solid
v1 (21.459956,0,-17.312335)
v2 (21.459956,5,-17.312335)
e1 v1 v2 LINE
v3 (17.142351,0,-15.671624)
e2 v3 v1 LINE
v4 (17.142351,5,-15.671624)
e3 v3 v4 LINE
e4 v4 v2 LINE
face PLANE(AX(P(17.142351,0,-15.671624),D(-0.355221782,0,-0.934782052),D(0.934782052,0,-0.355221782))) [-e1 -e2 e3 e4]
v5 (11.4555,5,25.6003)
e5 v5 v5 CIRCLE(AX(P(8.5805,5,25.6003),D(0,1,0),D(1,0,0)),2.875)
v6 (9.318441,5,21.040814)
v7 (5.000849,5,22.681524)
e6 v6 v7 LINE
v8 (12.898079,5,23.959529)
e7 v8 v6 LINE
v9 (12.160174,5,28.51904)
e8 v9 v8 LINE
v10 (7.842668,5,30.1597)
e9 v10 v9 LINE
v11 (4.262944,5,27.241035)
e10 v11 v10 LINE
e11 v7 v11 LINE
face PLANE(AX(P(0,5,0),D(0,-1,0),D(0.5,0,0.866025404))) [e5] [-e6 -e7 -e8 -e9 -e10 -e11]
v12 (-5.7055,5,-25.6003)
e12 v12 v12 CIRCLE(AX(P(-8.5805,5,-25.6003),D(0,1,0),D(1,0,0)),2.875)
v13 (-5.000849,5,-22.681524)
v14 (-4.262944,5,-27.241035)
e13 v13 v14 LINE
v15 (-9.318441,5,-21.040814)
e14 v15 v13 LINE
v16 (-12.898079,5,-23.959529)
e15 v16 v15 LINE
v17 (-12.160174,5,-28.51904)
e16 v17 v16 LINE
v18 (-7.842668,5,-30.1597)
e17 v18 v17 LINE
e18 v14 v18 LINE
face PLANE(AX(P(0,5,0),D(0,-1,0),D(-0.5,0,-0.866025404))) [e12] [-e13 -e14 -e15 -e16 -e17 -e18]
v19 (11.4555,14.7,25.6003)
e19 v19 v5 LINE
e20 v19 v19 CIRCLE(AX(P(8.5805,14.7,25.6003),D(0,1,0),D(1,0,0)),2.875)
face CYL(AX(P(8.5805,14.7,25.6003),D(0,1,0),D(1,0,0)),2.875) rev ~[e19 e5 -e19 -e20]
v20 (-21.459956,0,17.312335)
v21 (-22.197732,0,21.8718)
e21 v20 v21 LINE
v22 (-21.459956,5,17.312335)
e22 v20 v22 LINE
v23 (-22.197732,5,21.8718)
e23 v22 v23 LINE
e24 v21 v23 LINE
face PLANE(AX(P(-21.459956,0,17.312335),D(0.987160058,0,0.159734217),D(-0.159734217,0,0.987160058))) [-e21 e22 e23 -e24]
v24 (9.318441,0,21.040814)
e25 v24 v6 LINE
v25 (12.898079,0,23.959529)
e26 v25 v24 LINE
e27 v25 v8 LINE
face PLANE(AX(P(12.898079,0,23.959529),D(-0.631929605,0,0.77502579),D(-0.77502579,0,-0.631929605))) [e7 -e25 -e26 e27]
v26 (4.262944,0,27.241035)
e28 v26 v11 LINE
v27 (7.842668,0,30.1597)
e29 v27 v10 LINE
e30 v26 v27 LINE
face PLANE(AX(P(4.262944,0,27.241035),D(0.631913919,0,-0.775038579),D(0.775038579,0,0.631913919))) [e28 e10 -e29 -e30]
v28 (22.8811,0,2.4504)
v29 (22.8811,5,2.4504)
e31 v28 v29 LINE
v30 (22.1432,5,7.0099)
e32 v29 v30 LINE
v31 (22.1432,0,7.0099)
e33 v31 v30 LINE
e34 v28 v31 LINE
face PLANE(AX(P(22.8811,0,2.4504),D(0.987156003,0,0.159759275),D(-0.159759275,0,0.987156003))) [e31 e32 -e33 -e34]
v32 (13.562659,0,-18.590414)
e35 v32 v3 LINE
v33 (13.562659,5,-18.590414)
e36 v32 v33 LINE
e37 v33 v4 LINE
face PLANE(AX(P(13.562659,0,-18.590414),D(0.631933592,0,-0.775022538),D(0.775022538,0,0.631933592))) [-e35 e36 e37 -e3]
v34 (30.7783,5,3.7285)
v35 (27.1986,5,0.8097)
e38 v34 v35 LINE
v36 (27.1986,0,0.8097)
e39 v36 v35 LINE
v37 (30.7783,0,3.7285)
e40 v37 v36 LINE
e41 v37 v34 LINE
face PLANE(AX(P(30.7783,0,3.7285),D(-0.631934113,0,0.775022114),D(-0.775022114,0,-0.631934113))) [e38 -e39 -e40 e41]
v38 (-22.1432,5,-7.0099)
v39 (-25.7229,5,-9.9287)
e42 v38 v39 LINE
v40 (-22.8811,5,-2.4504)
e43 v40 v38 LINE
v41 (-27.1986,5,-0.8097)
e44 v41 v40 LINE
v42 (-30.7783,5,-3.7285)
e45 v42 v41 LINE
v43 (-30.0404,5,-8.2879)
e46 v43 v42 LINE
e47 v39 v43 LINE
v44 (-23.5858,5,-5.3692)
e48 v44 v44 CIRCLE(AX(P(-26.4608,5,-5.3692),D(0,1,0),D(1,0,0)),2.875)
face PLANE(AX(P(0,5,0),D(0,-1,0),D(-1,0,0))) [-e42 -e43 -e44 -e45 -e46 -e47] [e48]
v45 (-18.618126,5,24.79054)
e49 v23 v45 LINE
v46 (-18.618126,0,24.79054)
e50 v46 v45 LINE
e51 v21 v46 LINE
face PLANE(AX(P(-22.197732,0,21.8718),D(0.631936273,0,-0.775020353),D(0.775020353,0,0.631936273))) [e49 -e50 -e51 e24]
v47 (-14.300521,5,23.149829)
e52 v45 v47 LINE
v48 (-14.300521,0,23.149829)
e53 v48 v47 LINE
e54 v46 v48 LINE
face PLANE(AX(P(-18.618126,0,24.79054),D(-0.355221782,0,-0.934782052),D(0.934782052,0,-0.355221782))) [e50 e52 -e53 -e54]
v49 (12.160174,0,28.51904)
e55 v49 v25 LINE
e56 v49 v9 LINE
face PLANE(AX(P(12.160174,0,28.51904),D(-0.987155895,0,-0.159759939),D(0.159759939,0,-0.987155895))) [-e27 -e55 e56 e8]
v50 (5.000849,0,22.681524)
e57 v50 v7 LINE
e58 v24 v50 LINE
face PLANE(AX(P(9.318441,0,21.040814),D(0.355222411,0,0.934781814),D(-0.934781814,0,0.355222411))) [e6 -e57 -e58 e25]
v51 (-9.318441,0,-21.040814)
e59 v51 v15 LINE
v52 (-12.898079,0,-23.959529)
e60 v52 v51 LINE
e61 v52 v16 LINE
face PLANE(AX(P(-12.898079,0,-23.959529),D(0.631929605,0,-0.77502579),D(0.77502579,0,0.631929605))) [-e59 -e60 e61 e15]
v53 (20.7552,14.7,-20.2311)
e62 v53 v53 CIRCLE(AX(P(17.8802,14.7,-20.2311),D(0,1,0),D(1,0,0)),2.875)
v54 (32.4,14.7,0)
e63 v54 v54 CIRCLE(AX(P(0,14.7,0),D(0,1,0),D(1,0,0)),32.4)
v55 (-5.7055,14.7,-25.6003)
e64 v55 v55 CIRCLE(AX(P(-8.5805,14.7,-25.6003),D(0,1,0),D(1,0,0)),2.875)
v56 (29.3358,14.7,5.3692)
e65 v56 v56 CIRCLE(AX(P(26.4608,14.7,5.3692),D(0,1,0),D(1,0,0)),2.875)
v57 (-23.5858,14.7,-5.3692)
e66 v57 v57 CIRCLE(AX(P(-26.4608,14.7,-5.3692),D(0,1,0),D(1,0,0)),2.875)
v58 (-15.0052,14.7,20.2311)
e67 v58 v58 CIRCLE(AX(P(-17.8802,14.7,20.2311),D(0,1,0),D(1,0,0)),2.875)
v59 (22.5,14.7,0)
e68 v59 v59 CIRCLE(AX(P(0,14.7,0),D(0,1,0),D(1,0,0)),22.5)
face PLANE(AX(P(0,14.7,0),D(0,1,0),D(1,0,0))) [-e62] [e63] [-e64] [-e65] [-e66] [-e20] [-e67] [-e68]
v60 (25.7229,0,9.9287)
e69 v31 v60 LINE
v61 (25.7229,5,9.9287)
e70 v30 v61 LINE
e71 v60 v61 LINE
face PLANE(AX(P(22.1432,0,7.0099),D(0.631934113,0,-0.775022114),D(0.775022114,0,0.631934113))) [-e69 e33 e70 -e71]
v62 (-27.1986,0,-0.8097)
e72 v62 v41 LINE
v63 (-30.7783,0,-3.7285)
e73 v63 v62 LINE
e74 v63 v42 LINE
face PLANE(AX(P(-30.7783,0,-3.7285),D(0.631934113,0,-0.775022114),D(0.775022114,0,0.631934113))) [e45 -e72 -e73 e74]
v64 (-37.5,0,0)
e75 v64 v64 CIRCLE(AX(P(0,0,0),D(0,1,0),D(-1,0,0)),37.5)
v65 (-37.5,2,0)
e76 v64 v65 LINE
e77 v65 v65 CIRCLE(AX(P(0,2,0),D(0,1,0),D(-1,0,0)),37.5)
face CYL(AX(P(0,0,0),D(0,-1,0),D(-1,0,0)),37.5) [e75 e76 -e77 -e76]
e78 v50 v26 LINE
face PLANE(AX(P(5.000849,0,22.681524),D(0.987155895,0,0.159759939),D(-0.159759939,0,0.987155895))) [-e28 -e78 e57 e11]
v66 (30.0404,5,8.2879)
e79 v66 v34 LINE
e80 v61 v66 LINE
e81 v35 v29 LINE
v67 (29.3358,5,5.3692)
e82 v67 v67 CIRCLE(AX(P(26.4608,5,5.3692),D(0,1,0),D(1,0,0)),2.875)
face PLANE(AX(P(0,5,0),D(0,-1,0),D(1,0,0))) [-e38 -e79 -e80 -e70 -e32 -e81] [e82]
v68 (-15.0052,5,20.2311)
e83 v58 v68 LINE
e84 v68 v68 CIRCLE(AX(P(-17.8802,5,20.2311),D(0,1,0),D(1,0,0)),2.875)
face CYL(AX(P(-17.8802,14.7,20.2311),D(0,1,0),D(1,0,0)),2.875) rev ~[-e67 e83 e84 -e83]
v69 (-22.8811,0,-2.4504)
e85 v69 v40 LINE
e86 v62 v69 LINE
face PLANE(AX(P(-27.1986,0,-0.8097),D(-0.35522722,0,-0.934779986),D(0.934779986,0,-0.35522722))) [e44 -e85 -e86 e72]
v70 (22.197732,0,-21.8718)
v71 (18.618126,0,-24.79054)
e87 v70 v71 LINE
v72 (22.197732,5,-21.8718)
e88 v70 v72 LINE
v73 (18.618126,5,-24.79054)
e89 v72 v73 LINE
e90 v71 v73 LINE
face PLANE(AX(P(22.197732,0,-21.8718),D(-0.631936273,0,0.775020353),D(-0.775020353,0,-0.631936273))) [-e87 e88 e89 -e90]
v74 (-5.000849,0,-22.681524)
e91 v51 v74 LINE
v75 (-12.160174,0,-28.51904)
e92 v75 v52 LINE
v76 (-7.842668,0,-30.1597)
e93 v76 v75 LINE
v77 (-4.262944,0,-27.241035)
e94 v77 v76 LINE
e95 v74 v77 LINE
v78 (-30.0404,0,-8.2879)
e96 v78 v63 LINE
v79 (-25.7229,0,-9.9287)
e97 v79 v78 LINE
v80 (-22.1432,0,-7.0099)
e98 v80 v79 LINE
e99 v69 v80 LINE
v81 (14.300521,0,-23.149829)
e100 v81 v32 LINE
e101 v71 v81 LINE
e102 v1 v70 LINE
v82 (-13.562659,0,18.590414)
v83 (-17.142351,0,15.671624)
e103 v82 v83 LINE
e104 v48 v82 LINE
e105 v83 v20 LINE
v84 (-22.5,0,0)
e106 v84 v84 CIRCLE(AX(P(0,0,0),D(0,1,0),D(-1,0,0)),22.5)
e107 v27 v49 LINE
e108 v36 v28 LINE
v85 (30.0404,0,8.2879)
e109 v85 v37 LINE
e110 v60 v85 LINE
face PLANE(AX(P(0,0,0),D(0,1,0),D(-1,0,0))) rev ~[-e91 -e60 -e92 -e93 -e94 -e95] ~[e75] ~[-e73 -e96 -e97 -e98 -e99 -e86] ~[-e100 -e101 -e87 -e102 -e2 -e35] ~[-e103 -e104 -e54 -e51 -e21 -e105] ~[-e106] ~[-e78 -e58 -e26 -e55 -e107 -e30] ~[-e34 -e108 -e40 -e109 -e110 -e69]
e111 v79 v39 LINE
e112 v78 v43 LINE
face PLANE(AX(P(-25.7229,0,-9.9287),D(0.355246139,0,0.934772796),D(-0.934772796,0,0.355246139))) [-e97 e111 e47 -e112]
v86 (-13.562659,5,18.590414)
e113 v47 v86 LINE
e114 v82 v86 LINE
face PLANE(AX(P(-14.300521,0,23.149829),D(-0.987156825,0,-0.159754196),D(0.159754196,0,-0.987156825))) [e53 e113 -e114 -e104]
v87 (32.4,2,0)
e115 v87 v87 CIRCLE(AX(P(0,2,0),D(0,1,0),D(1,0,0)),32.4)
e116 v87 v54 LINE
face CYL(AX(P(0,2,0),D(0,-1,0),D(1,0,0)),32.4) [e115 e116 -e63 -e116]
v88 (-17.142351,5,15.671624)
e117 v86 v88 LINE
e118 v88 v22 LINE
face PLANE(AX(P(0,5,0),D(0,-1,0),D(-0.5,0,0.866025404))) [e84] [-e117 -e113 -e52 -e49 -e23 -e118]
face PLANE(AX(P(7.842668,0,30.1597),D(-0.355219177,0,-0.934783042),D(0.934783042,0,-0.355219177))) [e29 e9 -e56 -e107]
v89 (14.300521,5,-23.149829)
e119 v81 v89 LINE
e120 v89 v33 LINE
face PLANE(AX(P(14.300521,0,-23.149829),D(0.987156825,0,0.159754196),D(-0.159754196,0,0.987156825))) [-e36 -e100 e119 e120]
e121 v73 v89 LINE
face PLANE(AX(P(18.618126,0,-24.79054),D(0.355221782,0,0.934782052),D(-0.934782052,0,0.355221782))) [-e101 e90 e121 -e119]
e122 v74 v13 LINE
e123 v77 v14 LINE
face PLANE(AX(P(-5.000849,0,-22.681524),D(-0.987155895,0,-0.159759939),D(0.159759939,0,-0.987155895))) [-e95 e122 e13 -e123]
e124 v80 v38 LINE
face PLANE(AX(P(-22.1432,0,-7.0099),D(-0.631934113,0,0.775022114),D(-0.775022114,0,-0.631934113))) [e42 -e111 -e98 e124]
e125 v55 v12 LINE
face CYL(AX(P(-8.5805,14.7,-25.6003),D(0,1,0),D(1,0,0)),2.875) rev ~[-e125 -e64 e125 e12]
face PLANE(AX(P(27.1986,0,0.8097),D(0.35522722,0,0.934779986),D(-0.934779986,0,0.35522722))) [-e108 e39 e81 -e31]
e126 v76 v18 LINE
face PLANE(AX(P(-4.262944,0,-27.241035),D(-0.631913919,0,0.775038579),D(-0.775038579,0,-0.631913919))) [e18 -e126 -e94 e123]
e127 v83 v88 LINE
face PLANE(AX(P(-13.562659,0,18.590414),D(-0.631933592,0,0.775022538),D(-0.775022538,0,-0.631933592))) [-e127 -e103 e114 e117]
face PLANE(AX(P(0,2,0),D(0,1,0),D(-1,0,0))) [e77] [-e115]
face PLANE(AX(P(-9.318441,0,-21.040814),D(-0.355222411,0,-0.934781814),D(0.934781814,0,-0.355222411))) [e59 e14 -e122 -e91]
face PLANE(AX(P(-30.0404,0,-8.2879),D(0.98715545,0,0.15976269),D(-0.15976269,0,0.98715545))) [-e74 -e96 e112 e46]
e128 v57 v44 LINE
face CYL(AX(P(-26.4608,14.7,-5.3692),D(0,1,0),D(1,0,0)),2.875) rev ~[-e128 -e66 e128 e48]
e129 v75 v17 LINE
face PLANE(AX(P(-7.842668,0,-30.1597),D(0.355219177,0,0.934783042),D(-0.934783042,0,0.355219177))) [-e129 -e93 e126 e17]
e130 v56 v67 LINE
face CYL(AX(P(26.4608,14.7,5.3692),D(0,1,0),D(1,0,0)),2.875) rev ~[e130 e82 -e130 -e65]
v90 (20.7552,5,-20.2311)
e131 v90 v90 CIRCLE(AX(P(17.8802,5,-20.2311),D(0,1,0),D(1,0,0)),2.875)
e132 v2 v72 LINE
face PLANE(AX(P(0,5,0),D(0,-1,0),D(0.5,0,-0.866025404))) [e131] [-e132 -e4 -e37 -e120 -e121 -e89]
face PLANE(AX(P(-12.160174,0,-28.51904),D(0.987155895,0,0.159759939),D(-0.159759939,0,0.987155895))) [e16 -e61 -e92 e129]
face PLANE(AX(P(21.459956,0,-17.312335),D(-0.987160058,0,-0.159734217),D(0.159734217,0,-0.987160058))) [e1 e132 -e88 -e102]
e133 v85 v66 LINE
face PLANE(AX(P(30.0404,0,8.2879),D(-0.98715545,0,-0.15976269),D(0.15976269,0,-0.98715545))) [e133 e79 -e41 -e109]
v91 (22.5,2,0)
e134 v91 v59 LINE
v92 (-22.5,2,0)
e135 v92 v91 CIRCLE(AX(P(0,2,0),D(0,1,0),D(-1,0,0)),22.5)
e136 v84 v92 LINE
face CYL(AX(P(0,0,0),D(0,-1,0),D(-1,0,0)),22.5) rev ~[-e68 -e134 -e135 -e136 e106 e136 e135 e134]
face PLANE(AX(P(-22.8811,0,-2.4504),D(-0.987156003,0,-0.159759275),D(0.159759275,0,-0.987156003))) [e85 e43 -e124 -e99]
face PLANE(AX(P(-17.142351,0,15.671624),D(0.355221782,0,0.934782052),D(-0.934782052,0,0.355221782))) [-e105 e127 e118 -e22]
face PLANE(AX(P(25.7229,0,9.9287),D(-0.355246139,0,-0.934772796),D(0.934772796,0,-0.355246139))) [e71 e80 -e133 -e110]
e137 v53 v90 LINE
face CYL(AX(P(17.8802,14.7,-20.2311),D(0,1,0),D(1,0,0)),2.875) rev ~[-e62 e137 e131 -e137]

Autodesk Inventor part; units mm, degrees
ref_plane "YZ Plane" through (0, 0, 0) normal (1, 0, 0) x (0, 1, 0)
ref_plane "XZ Plane" through (0, 0, 0) normal (0, 1, 0) x (-1, 0, 0)
ref_plane "XY Plane" through (0, 0, 0) normal (0, 0, 1) x (1, 0, 0)
sketch "Sketch1" plane through (0, 0, 0) normal (0, 1, 0) x (-1, 0, 0)
  circle A0 centre (0, 0) radius 22.5
  circle A1 centre (0, 0) radius 37.5
  dimension "d0" = 45
  dimension "d1" = 75
extrude "Extrusion1" add sketch "Sketch1" along normal blind 2
sketch "Sketch2" plane through (0, 2, 0) normal (0, 1, 0) x (1, 0, 0)
  circle A0 centre (0, 0) radius 37.5 projected
  circle A1 centre (0, 0) radius 22.5 projected
  circle A2 centre (0, 0) radius 32.4
  dimension "d4" = 64.8
extrude "Extrusion2" add sketch "Sketch2" along normal blind 12.7 contours A2
feature "FaceDraft1" [suppressed]
sketch "Sketch3" plane through (0, 14.7, 0) normal (0, 1, 0) x (1, 0, 0)
  circle A0 centre (26.4608, -5.3692) radius 2.875 projected
  circle A1 centre (17.8802, 20.2311) radius 2.875 projected
  circle A2 centre (-8.5805, 25.6003) radius 2.875 projected
  circle A3 centre (-26.4608, 5.3692) radius 2.875 projected
  circle A4 centre (-17.8802, -20.2311) radius 2.875 projected
  circle A5 centre (8.5805, -25.6003) radius 2.875 projected
  point P0 (0, 0)
extrude "Extrusion3" cut sketch "Sketch3" against normal through all
sketch "Sketch4" plane through (0, 0, 0) normal (0, -1, 0) x (1, 0, 0)
  circle A0 centre (26.4608, 5.3692) radius 2.875 projected
  line L0 (30.7783, 3.7285) -> (27.1986, 0.8097)
  line L1 (27.1986, 0.8097) -> (22.8811, 2.4504)
  line L2 (22.8811, 2.4504) -> (22.1432, 7.0099)
  line L3 (22.1432, 7.0099) -> (25.7229, 9.9287)
  line L4 (25.7229, 9.9287) -> (30.0404, 8.2879)
  line L5 (30.0404, 8.2879) -> (30.7783, 3.7285)
  point P0 (0, 0)
  dimension "d10" = 8
extrude "Extrusion4" cut sketch "Sketch4" against normal blind 5 contours A0 | L0 L1 L2 L3 L4 L5
pattern_circular "Circular Pattern1" count 6 over 360 about axis through (0, 2, 0) along (0, 1, 0) of "Extrusion4"
properties part number "j1Flange"
